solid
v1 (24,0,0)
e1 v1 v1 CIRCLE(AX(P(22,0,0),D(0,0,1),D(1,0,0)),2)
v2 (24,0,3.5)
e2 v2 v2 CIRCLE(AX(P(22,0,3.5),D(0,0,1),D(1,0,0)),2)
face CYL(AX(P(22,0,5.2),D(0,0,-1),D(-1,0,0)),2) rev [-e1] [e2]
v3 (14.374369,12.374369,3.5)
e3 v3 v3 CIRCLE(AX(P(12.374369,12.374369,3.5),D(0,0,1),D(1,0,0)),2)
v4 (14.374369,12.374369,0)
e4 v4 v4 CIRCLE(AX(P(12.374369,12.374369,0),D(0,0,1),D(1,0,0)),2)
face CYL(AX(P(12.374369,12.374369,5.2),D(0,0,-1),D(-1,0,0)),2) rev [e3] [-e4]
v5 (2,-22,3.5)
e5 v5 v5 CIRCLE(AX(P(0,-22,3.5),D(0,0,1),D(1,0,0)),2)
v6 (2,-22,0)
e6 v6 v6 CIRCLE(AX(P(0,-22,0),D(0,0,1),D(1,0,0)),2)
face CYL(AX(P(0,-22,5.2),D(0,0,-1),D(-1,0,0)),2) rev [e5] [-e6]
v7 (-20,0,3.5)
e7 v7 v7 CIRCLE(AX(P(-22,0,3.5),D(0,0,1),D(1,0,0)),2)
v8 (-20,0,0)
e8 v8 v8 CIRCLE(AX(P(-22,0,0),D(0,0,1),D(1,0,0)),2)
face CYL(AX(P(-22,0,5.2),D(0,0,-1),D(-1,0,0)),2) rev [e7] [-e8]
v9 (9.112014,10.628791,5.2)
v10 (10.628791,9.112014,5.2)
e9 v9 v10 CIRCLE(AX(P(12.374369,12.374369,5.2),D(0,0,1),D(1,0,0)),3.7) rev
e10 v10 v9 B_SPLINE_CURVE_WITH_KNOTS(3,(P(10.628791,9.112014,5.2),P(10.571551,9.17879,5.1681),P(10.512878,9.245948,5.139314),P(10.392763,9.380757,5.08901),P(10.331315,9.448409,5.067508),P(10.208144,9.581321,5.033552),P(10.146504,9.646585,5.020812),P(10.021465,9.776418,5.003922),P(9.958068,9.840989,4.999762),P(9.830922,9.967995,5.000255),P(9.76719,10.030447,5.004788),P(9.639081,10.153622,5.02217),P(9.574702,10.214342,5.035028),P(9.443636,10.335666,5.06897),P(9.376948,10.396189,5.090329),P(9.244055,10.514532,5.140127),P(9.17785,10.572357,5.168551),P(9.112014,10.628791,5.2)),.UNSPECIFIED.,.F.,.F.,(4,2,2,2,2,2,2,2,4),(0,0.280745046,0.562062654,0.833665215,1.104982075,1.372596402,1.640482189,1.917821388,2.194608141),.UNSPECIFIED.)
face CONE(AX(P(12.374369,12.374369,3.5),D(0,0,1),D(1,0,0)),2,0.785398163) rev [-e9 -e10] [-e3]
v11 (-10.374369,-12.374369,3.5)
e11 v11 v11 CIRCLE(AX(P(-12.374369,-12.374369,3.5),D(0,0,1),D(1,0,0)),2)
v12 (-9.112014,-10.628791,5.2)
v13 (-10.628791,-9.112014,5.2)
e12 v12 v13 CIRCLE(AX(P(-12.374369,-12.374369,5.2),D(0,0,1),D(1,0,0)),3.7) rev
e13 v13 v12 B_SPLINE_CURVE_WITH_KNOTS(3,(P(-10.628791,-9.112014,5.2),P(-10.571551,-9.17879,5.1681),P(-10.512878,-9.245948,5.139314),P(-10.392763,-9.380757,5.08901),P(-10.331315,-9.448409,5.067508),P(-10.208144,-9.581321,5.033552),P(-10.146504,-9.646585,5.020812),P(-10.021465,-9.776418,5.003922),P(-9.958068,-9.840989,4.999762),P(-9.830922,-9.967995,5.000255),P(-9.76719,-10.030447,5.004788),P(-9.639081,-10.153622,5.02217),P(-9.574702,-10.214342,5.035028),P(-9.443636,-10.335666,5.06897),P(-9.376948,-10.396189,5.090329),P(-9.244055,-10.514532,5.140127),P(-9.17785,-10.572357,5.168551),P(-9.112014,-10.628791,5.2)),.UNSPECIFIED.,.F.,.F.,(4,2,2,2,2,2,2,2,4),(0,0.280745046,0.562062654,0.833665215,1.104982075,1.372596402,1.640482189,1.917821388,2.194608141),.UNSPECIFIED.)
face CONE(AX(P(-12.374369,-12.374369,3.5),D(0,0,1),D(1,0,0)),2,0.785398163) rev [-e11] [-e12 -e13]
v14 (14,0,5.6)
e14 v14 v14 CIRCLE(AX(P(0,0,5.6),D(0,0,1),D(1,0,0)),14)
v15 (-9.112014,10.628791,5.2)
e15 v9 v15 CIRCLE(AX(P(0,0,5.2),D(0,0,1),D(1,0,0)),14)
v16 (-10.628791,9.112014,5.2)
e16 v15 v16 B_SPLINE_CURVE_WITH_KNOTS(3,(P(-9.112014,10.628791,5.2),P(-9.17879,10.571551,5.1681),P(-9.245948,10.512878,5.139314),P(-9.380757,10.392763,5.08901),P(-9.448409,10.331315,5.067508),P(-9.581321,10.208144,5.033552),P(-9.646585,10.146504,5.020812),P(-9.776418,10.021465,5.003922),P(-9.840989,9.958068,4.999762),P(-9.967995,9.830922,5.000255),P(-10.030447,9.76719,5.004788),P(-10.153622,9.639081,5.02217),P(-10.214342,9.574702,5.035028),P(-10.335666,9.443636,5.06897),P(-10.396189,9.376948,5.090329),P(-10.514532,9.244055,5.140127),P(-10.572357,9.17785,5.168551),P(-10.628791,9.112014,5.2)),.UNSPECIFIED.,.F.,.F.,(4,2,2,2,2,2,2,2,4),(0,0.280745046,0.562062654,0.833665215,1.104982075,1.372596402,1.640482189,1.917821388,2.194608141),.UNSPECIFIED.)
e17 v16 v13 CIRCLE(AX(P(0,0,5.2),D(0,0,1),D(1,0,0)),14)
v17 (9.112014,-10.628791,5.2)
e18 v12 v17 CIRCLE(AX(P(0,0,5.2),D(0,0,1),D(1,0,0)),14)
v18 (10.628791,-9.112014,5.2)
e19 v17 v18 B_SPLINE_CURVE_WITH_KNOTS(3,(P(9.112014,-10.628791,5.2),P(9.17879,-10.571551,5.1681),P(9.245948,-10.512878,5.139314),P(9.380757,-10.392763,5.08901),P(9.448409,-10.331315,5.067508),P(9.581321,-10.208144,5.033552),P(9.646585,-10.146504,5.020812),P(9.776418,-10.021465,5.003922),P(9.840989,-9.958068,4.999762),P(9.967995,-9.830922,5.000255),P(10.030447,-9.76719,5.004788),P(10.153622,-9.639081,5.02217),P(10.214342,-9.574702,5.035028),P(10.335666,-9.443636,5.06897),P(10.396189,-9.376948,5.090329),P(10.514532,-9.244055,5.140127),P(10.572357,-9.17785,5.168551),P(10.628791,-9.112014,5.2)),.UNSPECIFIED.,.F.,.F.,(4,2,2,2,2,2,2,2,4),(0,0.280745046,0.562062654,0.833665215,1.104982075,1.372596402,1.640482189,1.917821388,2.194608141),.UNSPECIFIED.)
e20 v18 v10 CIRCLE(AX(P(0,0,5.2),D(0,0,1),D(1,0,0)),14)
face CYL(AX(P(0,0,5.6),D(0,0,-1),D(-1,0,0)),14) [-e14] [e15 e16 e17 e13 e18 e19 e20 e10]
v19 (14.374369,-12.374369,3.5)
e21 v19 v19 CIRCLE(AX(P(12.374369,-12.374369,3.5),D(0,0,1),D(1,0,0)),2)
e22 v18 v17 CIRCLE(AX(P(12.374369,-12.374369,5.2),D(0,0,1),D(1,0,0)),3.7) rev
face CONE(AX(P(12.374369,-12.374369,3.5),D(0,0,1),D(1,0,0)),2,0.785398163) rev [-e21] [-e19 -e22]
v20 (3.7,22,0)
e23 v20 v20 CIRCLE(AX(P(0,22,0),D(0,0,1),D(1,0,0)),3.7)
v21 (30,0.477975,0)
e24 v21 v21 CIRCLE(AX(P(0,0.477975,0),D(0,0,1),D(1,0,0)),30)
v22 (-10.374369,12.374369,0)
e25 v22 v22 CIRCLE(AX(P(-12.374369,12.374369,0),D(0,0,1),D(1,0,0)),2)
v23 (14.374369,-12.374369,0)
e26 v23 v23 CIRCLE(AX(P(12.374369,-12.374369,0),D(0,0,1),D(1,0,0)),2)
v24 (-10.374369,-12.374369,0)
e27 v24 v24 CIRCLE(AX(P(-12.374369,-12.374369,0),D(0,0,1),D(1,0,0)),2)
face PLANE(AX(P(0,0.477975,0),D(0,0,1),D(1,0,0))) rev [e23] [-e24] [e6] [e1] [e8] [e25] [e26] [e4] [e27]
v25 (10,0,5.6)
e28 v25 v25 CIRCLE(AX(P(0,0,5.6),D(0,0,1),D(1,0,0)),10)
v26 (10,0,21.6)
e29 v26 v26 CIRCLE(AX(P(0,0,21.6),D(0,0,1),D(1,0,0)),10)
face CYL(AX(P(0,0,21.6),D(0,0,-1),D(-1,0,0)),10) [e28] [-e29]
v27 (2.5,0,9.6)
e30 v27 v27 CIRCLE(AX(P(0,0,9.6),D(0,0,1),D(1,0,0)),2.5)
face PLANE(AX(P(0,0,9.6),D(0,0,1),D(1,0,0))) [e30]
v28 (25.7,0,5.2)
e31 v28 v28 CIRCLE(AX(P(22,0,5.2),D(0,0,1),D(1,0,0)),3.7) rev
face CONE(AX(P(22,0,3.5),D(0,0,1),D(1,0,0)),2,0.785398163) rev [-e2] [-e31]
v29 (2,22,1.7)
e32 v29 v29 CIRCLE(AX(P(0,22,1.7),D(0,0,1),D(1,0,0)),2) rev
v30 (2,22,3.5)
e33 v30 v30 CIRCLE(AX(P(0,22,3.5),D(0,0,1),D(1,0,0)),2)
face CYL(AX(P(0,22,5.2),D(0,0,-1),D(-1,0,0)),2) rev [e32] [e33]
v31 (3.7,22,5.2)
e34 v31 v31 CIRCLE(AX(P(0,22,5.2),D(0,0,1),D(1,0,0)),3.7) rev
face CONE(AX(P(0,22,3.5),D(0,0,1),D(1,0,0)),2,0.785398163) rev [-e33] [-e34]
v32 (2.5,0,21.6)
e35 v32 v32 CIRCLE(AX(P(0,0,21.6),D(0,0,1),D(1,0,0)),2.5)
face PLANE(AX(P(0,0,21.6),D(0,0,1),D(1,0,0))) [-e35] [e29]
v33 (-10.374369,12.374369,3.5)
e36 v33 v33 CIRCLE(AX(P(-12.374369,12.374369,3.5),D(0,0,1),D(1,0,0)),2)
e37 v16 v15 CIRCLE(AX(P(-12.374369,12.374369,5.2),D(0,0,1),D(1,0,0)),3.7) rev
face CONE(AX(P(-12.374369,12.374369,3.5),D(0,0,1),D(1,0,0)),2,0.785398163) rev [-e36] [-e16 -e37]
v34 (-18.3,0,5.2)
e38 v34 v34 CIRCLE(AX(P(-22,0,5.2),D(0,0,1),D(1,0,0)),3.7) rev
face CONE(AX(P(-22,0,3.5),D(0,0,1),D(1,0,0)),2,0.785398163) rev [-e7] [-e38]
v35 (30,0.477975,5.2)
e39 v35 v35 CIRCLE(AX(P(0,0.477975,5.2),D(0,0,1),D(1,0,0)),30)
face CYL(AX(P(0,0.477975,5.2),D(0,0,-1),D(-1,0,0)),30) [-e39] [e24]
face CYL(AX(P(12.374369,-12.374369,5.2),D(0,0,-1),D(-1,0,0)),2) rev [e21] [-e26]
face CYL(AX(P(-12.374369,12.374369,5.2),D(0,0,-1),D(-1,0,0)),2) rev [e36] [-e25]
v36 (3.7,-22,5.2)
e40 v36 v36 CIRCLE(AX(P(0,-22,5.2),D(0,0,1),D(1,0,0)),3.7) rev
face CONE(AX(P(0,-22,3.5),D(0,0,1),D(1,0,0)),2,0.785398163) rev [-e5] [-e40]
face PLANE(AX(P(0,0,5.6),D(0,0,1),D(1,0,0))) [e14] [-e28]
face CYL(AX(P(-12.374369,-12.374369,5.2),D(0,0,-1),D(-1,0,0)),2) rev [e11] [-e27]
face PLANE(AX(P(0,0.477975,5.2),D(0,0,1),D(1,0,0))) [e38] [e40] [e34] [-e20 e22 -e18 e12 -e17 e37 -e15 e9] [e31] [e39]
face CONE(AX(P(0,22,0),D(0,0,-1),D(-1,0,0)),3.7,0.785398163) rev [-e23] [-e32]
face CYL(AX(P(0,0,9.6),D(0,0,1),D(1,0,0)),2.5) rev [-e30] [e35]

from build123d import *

# Parameters (mm, degrees)
SKETCH_1_R          = 30
SKETCH_1_R_2        = 2
EXTRUDE_1_DEPTH     = 5.2
SKETCH_2_R          = 14
EXTRUDE_2_DEPTH     = 0.4
SKETCH_3_R          = 10
EXTRUDE_3_DEPTH     = 16
SKETCH_4_R          = 2.5
CUT_EXTRUDE_1_DEPTH = 12
CHAMFER_1_SIZE      = 1.7


with BuildPart() as part:
    # 草图1 → 凸台-拉伸1 (new body)
    with BuildSketch(Plane.XY):
        with Locations((0, 0.477974548)):
            Circle(SKETCH_1_R)
        with Locations((0, 22)):
            Circle(SKETCH_1_R_2, mode=Mode.SUBTRACT)
        with Locations((-12.374368671, 12.374368671)):
            Circle(SKETCH_1_R_2, mode=Mode.SUBTRACT)
        with Locations((22, 0)):
            Circle(SKETCH_1_R_2, mode=Mode.SUBTRACT)
        with Locations((12.374368671, 12.374368671)):
            Circle(SKETCH_1_R_2, mode=Mode.SUBTRACT)
        with Locations((0, -22)):
            Circle(SKETCH_1_R_2, mode=Mode.SUBTRACT)
        with Locations((12.374368671, -12.374368671)):
            Circle(SKETCH_1_R_2, mode=Mode.SUBTRACT)
        with Locations((-22, 0)):
            Circle(SKETCH_1_R_2, mode=Mode.SUBTRACT)
        with Locations((-12.374368671, -12.374368671)):
            Circle(SKETCH_1_R_2, mode=Mode.SUBTRACT)
    extrude(amount=EXTRUDE_1_DEPTH)

    # 草图2 → 凸台-拉伸2 (add)
    with BuildSketch(Plane.XY.offset(5.2)):
        Circle(SKETCH_2_R)
    extrude(amount=EXTRUDE_2_DEPTH)

    # 草图3 → 凸台-拉伸3 (add)
    with BuildSketch(Plane.XY.offset(5.6)):
        Circle(SKETCH_3_R)
    extrude(amount=EXTRUDE_3_DEPTH)

    # 草图4 → 切除-拉伸1 (cut)
    with BuildSketch(Plane.XY.offset(21.6)):
        Circle(SKETCH_4_R)
    extrude(amount=-CUT_EXTRUDE_1_DEPTH, mode=Mode.SUBTRACT)

    # 倒角1
    # the kernel refuses this chamfer: 1.7 mm, written as the material it takes off along each edge
    with BuildSketch(Plane(origin=(22, 0, 5.2), x_dir=(1, 0, 0), z_dir=(0, -1, 0))) as chamfer_1_piece_1:
        Polygon((2 + CHAMFER_1_SIZE, 0), (2, -CHAMFER_1_SIZE), (2, 0), align=None)
    revolve(axis=Axis((22, 0, 5.2), (0, 0, 1)), mode=Mode.SUBTRACT)
    with BuildSketch(Plane(origin=(12.374368671, 12.374368671, 5.2), x_dir=(1, 0, 0), z_dir=(0, -1, 0))) as chamfer_1_piece_2_section:
        Polygon((2 + CHAMFER_1_SIZE, 0), (2, -CHAMFER_1_SIZE), (2, 0), align=None)
    chamfer_1_piece_2 = revolve(axis=Axis((12.374368671, 12.374368671, 5.2), (0, 0, 1)), mode=Mode.PRIVATE)
    chamfer_1_piece_2 = chamfer_1_piece_2 - Plane(origin=(0, 0, 4.370822152), x_dir=(1, 0, 0), z_dir=(0, 0, -1)) * Cylinder(14, 15, mode=Mode.PRIVATE)
    add(chamfer_1_piece_2, mode=Mode.SUBTRACT)
    with BuildSketch(Plane(origin=(0, -22, 5.2), x_dir=(1, 0, 0), z_dir=(0, -1, 0))) as chamfer_1_piece_3:
        Polygon((2 + CHAMFER_1_SIZE, 0), (2, -CHAMFER_1_SIZE), (2, 0), align=None)
    revolve(axis=Axis((0, -22, 5.2), (0, 0, 1)), mode=Mode.SUBTRACT)
    with BuildSketch(Plane(origin=(12.374368671, -12.374368671, 5.2), x_dir=(1, 0, 0), z_dir=(0, -1, 0))) as chamfer_1_piece_4_section:
        Polygon((2 + CHAMFER_1_SIZE, 0), (2, -CHAMFER_1_SIZE), (2, 0), align=None)
    chamfer_1_piece_4 = revolve(axis=Axis((12.374368671, -12.374368671, 5.2), (0, 0, 1)), mode=Mode.PRIVATE)
    chamfer_1_piece_4 = chamfer_1_piece_4 - Plane(origin=(0, 0, 4.370822149), x_dir=(1, 0, 0), z_dir=(0, 0, -1)) * Cylinder(14, 15, mode=Mode.PRIVATE)
    add(chamfer_1_piece_4, mode=Mode.SUBTRACT)
    with BuildSketch(Plane(origin=(-22, 0, 5.2), x_dir=(1, 0, 0), z_dir=(0, -1, 0))) as chamfer_1_piece_5:
        Polygon((2 + CHAMFER_1_SIZE, 0), (2, -CHAMFER_1_SIZE), (2, 0), align=None)
    revolve(axis=Axis((-22, 0, 5.2), (0, 0, 1)), mode=Mode.SUBTRACT)
    with BuildSketch(Plane(origin=(-12.374368671, -12.374368671, 5.2), x_dir=(1, 0, 0), z_dir=(0, -1, 0))) as chamfer_1_piece_6_section:
        Polygon((2 + CHAMFER_1_SIZE, 0), (2, -CHAMFER_1_SIZE), (2, 0), align=None)
    chamfer_1_piece_6 = revolve(axis=Axis((-12.374368671, -12.374368671, 5.2), (0, 0, 1)), mode=Mode.PRIVATE)
    chamfer_1_piece_6 = chamfer_1_piece_6 - Plane(origin=(0, 0, 4.370822148), x_dir=(1, 0, 0), z_dir=(0, 0, -1)) * Cylinder(14, 15, mode=Mode.PRIVATE)
    add(chamfer_1_piece_6, mode=Mode.SUBTRACT)
    with BuildSketch(Plane(origin=(0, 22, 0), x_dir=(1, 0, 0), z_dir=(0, -1, 0))) as chamfer_1_piece_7:
        Polygon((2 + CHAMFER_1_SIZE, 0), (2, CHAMFER_1_SIZE), (2, 0), align=None)
    revolve(axis=Axis((0, 22, 0), (0, 0, 1)), mode=Mode.SUBTRACT)
    with BuildSketch(Plane(origin=(0, 22, 5.2), x_dir=(1, 0, 0), z_dir=(0, -1, 0))) as chamfer_1_piece_8:
        Polygon((2 + CHAMFER_1_SIZE, 0), (2, -CHAMFER_1_SIZE), (2, 0), align=None)
    revolve(axis=Axis((0, 22, 5.2), (0, 0, 1)), mode=Mode.SUBTRACT)
    with BuildSketch(Plane(origin=(-12.374368671, 12.374368671, 5.2), x_dir=(1, 0, 0), z_dir=(0, -1, 0))) as chamfer_1_piece_9_section:
        Polygon((2 + CHAMFER_1_SIZE, 0), (2, -CHAMFER_1_SIZE), (2, 0), align=None)
    chamfer_1_piece_9 = revolve(axis=Axis((-12.374368671, 12.374368671, 5.2), (0, 0, 1)), mode=Mode.PRIVATE)
    chamfer_1_piece_9 = chamfer_1_piece_9 - Plane(origin=(0, 0, 4.370822151), x_dir=(1, 0, 0), z_dir=(0, 0, -1)) * Cylinder(14, 15, mode=Mode.PRIVATE)
    add(chamfer_1_piece_9, mode=Mode.SUBTRACT)


solid = part.part
